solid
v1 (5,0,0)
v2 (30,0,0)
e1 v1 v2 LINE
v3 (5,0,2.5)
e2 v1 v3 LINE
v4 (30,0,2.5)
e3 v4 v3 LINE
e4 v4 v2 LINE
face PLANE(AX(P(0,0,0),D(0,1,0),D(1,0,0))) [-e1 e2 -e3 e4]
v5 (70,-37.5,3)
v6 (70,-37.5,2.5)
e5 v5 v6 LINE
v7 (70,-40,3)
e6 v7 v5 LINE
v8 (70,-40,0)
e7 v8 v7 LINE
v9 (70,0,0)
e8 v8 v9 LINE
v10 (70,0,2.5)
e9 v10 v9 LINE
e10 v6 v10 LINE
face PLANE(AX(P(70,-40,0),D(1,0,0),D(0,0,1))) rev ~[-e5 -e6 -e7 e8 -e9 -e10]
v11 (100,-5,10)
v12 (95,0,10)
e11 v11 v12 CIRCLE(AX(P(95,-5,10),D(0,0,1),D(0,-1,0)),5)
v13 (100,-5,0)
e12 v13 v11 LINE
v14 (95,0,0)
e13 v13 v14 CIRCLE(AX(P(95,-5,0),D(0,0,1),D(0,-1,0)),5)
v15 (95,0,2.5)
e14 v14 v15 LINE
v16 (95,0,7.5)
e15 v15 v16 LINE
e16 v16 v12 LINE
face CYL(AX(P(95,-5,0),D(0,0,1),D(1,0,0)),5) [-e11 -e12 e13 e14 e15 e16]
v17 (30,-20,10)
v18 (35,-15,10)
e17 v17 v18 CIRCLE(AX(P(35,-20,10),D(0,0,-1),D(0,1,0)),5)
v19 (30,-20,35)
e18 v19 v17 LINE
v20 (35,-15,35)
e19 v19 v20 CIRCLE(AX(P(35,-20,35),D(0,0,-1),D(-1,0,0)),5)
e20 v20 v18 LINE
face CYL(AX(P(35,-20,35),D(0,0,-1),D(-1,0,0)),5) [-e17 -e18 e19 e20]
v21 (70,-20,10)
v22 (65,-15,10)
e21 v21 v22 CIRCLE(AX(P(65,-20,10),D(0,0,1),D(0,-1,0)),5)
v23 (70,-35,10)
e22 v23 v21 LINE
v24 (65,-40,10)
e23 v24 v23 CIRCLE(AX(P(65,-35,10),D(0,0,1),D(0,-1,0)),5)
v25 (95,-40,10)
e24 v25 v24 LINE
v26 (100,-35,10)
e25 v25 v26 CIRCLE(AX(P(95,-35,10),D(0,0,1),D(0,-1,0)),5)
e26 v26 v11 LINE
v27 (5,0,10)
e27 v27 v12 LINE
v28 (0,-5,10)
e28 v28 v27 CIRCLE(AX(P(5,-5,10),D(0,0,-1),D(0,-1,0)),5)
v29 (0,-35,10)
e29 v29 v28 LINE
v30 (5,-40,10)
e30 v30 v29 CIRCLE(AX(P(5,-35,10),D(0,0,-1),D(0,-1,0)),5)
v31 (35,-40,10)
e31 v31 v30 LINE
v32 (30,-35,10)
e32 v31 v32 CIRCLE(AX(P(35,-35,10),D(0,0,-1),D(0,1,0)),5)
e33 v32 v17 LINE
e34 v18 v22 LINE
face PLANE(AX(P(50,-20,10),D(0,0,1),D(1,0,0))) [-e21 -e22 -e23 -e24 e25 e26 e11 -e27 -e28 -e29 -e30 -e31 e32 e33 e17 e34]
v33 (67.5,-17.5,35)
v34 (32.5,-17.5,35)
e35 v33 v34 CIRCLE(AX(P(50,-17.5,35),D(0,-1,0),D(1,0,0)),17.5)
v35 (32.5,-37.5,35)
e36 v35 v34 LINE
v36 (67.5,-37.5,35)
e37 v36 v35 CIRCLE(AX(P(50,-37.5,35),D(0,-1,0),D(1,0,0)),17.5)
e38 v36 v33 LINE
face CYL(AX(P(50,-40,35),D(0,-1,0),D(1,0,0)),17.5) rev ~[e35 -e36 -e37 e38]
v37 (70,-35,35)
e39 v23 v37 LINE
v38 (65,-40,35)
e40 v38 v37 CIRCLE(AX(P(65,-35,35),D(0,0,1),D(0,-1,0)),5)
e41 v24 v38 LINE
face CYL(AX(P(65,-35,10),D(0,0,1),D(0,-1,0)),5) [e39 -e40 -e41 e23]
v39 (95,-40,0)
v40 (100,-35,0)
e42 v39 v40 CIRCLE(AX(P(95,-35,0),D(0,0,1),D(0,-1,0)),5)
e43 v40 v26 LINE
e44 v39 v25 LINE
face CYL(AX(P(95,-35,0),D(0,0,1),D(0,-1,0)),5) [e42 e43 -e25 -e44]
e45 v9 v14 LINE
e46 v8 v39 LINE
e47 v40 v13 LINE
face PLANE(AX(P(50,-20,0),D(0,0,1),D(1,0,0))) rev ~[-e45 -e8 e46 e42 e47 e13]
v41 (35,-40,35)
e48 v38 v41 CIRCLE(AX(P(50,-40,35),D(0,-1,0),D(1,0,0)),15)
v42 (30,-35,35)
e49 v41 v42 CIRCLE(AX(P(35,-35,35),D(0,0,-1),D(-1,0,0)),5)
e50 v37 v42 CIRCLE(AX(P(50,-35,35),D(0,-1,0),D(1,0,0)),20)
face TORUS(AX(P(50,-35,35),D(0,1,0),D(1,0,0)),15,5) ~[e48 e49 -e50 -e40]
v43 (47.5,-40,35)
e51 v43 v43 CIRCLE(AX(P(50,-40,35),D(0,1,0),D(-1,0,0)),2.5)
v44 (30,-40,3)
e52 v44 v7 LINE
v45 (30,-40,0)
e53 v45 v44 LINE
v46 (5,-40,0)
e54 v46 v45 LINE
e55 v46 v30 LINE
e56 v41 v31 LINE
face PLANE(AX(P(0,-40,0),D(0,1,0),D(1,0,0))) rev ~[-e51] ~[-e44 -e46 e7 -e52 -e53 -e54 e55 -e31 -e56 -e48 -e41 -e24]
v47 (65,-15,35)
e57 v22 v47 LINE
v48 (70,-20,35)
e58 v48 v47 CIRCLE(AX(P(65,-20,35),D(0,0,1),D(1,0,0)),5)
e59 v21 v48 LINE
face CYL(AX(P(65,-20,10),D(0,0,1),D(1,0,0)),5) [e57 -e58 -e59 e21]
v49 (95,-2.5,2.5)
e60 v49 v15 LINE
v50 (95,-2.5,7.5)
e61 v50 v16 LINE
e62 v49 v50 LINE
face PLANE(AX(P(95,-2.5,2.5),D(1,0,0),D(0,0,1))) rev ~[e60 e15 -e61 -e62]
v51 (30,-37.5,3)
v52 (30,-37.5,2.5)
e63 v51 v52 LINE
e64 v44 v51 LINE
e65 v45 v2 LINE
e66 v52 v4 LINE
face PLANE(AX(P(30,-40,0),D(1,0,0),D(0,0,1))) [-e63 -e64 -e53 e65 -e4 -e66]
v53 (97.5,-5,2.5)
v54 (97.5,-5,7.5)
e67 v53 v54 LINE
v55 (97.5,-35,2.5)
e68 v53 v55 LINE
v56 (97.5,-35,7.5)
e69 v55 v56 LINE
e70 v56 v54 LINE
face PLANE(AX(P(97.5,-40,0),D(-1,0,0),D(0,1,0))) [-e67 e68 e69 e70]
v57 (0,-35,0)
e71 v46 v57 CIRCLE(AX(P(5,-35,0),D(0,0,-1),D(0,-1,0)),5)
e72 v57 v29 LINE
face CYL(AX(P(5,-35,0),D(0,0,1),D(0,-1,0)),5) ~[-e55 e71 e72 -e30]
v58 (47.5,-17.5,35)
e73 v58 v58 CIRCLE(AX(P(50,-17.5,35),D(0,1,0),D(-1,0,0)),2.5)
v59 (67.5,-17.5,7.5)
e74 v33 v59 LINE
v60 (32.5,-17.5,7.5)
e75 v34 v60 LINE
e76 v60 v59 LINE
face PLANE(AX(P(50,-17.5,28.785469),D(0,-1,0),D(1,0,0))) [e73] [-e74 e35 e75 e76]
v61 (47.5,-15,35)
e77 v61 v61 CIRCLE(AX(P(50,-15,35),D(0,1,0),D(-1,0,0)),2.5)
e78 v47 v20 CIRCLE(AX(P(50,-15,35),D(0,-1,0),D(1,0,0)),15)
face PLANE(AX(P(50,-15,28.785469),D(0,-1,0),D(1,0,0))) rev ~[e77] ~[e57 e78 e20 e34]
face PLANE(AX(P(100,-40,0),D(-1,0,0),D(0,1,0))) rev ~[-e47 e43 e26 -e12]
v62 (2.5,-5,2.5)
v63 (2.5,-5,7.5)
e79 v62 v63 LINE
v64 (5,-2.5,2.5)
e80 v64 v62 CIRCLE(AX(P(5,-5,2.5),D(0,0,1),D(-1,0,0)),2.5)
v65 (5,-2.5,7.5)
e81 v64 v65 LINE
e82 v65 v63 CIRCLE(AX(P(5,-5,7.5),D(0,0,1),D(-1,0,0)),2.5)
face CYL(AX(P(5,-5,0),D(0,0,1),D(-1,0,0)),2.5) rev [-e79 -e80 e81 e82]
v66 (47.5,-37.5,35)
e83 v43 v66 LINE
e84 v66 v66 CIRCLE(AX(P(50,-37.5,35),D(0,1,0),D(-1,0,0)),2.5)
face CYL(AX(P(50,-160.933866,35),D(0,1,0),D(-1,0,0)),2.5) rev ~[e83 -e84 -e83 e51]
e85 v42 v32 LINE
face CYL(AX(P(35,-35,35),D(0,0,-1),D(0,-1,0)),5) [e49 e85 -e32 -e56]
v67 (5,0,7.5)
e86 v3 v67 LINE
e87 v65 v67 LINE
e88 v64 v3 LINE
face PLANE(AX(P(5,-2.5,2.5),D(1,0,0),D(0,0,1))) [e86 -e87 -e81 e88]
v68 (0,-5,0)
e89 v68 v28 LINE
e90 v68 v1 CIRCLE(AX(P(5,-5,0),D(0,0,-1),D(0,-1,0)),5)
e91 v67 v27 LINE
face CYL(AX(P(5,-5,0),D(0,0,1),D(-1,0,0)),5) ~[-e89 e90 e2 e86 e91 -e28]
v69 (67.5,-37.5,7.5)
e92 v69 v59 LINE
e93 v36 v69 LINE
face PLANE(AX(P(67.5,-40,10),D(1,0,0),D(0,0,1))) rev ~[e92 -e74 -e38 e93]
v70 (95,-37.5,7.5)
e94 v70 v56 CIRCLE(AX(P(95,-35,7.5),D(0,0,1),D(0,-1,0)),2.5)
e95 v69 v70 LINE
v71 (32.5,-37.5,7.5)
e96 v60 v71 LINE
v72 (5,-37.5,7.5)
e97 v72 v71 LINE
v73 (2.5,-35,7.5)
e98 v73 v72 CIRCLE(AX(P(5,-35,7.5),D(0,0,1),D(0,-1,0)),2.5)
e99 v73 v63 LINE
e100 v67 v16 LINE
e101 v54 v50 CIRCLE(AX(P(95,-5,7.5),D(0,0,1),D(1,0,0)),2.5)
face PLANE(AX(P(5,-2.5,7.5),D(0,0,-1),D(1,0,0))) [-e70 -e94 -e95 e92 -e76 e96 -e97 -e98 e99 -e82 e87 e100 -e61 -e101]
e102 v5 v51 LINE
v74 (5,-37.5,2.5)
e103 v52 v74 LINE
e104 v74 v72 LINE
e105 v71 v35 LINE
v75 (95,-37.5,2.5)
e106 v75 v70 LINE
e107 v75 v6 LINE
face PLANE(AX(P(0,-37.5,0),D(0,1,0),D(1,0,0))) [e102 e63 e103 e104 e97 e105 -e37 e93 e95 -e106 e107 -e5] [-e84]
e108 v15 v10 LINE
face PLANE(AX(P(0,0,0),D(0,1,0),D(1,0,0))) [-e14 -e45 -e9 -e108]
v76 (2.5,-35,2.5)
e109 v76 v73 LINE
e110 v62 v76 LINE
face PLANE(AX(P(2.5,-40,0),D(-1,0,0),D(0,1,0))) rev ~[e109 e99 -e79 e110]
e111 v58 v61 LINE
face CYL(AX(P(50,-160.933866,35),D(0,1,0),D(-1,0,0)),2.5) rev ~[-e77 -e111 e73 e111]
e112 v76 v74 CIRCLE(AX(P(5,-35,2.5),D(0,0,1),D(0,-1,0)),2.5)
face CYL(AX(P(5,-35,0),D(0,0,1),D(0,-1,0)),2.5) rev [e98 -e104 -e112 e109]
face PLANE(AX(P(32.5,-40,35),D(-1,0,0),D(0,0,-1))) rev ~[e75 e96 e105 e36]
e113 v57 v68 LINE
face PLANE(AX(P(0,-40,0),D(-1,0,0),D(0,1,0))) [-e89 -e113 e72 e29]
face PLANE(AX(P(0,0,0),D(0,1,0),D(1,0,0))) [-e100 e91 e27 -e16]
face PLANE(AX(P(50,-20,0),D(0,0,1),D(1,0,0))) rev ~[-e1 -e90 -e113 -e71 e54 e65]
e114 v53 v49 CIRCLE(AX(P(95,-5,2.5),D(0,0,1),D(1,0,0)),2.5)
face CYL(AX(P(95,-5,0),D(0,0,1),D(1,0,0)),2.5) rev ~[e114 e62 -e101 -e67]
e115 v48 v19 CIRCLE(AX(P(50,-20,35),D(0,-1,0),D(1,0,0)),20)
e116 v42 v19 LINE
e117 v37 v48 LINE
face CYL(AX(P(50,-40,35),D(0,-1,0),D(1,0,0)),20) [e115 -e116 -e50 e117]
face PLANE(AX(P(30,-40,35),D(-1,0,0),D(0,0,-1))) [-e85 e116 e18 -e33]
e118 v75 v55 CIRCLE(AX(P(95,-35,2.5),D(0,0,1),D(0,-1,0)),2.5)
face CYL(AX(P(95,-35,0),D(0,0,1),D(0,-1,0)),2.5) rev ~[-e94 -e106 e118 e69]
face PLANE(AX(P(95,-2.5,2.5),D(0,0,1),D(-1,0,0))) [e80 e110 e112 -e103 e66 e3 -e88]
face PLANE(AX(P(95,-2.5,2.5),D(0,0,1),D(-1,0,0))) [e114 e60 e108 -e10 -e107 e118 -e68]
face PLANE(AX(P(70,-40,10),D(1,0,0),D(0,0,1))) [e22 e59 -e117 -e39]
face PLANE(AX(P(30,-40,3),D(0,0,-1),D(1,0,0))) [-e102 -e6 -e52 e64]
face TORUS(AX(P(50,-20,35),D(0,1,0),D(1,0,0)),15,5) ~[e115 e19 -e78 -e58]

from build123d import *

# Parameters (mm, degrees)
F0_W      = 100
F0_H      = 40
F1_DEPTH  = 10
F3_R      = 5
F4_R      = 5
F5_R      = 5
F6_R      = 5
F7_DEPTH  = 25
F8_T      = -2.5
F9_R      = 5
F10_R     = 5
F12_D     = 5
F13_W     = 40
F13_H     = 3
F14_DEPTH = 40.001


# Not quite as in the source:
# - a shell that OpenCascade refuses in one call is made with other operations: the cavity is built on its own and cut out


with BuildPart() as f1:
    # F0 (on Top) → F1 (new body)
    with BuildSketch(Plane.XY):
        with Locations((50, -20)):
            Rectangle(F0_W, F0_H)
    extrude(amount=F1_DEPTH)

    # F3
    f3_edges = [f1.edges().sort_by_distance(p)[0] for p in [
        (100, -40, 5),
    ]]
    fillet(f3_edges, radius=F3_R)

    # F4
    f4_edges = [f1.edges().sort_by_distance(p)[0] for p in [
        (100, 0, 5),
    ]]
    fillet(f4_edges, radius=F4_R)

    # F5
    f5_edges = [f1.edges().sort_by_distance(p)[0] for p in [
        (0, -40, 5),
    ]]
    fillet(f5_edges, radius=F5_R)

    # F6
    f6_edges = [f1.edges().sort_by_distance(p)[0] for p in [
        (0, 0, 5),
    ]]
    fillet(f6_edges, radius=F6_R)

    # F2 (on face) → F7 (join)
    with BuildSketch(Plane.XZ.offset(40)):
        with BuildLine():
            Line((30, 35), (30, 10))
            Line((30, 10), (70, 10))
            Line((70, 10), (70, 35))
            ThreePointArc((70, 35), (50, 55), (30, 35))
        make_face()
    extrude(amount=-F7_DEPTH)

    # F8: a shell. OpenCascade refuses it in one call, so the cavity is built on its own and cut out:
    # the body offset inwards by the wall thickness, plus a prism from it out through each open face.
    f8_core = offset(f1.part, amount=F8_T, kind=Kind.INTERSECTION, mode=Mode.PRIVATE)
    f8_exits = [f8_core.faces().sort_by_distance(p)[0] for p in [
        (50, -2.5, 5),
    ]]
    add(f8_core, mode=Mode.SUBTRACT)
    extrude(f8_exits, amount=-F8_T, mode=Mode.SUBTRACT)

    # F9
    f9_edges = [f1.edges().sort_by_distance(p)[0] for p in [
        (30, -40, 22.5),
    ]]
    fillet(f9_edges, radius=F9_R)

    # F10
    f10_edges = [f1.edges().sort_by_distance(p)[0] for p in [
        (30, -15, 22.5),
    ]]
    fillet(f10_edges, radius=F10_R)

    # F12 (through all)
    with Locations(Plane.XZ.offset(40)):
        with Locations((50, 35)):
            Hole(F12_D / 2)

    # F13 (on face) → F14 (cut, through all)
    with BuildSketch(Plane.XZ.offset(40)):
        with Locations((50, 1.5)):
            Rectangle(F13_W, F13_H)
    extrude(amount=-F14_DEPTH, mode=Mode.SUBTRACT)


solid = f1.part
